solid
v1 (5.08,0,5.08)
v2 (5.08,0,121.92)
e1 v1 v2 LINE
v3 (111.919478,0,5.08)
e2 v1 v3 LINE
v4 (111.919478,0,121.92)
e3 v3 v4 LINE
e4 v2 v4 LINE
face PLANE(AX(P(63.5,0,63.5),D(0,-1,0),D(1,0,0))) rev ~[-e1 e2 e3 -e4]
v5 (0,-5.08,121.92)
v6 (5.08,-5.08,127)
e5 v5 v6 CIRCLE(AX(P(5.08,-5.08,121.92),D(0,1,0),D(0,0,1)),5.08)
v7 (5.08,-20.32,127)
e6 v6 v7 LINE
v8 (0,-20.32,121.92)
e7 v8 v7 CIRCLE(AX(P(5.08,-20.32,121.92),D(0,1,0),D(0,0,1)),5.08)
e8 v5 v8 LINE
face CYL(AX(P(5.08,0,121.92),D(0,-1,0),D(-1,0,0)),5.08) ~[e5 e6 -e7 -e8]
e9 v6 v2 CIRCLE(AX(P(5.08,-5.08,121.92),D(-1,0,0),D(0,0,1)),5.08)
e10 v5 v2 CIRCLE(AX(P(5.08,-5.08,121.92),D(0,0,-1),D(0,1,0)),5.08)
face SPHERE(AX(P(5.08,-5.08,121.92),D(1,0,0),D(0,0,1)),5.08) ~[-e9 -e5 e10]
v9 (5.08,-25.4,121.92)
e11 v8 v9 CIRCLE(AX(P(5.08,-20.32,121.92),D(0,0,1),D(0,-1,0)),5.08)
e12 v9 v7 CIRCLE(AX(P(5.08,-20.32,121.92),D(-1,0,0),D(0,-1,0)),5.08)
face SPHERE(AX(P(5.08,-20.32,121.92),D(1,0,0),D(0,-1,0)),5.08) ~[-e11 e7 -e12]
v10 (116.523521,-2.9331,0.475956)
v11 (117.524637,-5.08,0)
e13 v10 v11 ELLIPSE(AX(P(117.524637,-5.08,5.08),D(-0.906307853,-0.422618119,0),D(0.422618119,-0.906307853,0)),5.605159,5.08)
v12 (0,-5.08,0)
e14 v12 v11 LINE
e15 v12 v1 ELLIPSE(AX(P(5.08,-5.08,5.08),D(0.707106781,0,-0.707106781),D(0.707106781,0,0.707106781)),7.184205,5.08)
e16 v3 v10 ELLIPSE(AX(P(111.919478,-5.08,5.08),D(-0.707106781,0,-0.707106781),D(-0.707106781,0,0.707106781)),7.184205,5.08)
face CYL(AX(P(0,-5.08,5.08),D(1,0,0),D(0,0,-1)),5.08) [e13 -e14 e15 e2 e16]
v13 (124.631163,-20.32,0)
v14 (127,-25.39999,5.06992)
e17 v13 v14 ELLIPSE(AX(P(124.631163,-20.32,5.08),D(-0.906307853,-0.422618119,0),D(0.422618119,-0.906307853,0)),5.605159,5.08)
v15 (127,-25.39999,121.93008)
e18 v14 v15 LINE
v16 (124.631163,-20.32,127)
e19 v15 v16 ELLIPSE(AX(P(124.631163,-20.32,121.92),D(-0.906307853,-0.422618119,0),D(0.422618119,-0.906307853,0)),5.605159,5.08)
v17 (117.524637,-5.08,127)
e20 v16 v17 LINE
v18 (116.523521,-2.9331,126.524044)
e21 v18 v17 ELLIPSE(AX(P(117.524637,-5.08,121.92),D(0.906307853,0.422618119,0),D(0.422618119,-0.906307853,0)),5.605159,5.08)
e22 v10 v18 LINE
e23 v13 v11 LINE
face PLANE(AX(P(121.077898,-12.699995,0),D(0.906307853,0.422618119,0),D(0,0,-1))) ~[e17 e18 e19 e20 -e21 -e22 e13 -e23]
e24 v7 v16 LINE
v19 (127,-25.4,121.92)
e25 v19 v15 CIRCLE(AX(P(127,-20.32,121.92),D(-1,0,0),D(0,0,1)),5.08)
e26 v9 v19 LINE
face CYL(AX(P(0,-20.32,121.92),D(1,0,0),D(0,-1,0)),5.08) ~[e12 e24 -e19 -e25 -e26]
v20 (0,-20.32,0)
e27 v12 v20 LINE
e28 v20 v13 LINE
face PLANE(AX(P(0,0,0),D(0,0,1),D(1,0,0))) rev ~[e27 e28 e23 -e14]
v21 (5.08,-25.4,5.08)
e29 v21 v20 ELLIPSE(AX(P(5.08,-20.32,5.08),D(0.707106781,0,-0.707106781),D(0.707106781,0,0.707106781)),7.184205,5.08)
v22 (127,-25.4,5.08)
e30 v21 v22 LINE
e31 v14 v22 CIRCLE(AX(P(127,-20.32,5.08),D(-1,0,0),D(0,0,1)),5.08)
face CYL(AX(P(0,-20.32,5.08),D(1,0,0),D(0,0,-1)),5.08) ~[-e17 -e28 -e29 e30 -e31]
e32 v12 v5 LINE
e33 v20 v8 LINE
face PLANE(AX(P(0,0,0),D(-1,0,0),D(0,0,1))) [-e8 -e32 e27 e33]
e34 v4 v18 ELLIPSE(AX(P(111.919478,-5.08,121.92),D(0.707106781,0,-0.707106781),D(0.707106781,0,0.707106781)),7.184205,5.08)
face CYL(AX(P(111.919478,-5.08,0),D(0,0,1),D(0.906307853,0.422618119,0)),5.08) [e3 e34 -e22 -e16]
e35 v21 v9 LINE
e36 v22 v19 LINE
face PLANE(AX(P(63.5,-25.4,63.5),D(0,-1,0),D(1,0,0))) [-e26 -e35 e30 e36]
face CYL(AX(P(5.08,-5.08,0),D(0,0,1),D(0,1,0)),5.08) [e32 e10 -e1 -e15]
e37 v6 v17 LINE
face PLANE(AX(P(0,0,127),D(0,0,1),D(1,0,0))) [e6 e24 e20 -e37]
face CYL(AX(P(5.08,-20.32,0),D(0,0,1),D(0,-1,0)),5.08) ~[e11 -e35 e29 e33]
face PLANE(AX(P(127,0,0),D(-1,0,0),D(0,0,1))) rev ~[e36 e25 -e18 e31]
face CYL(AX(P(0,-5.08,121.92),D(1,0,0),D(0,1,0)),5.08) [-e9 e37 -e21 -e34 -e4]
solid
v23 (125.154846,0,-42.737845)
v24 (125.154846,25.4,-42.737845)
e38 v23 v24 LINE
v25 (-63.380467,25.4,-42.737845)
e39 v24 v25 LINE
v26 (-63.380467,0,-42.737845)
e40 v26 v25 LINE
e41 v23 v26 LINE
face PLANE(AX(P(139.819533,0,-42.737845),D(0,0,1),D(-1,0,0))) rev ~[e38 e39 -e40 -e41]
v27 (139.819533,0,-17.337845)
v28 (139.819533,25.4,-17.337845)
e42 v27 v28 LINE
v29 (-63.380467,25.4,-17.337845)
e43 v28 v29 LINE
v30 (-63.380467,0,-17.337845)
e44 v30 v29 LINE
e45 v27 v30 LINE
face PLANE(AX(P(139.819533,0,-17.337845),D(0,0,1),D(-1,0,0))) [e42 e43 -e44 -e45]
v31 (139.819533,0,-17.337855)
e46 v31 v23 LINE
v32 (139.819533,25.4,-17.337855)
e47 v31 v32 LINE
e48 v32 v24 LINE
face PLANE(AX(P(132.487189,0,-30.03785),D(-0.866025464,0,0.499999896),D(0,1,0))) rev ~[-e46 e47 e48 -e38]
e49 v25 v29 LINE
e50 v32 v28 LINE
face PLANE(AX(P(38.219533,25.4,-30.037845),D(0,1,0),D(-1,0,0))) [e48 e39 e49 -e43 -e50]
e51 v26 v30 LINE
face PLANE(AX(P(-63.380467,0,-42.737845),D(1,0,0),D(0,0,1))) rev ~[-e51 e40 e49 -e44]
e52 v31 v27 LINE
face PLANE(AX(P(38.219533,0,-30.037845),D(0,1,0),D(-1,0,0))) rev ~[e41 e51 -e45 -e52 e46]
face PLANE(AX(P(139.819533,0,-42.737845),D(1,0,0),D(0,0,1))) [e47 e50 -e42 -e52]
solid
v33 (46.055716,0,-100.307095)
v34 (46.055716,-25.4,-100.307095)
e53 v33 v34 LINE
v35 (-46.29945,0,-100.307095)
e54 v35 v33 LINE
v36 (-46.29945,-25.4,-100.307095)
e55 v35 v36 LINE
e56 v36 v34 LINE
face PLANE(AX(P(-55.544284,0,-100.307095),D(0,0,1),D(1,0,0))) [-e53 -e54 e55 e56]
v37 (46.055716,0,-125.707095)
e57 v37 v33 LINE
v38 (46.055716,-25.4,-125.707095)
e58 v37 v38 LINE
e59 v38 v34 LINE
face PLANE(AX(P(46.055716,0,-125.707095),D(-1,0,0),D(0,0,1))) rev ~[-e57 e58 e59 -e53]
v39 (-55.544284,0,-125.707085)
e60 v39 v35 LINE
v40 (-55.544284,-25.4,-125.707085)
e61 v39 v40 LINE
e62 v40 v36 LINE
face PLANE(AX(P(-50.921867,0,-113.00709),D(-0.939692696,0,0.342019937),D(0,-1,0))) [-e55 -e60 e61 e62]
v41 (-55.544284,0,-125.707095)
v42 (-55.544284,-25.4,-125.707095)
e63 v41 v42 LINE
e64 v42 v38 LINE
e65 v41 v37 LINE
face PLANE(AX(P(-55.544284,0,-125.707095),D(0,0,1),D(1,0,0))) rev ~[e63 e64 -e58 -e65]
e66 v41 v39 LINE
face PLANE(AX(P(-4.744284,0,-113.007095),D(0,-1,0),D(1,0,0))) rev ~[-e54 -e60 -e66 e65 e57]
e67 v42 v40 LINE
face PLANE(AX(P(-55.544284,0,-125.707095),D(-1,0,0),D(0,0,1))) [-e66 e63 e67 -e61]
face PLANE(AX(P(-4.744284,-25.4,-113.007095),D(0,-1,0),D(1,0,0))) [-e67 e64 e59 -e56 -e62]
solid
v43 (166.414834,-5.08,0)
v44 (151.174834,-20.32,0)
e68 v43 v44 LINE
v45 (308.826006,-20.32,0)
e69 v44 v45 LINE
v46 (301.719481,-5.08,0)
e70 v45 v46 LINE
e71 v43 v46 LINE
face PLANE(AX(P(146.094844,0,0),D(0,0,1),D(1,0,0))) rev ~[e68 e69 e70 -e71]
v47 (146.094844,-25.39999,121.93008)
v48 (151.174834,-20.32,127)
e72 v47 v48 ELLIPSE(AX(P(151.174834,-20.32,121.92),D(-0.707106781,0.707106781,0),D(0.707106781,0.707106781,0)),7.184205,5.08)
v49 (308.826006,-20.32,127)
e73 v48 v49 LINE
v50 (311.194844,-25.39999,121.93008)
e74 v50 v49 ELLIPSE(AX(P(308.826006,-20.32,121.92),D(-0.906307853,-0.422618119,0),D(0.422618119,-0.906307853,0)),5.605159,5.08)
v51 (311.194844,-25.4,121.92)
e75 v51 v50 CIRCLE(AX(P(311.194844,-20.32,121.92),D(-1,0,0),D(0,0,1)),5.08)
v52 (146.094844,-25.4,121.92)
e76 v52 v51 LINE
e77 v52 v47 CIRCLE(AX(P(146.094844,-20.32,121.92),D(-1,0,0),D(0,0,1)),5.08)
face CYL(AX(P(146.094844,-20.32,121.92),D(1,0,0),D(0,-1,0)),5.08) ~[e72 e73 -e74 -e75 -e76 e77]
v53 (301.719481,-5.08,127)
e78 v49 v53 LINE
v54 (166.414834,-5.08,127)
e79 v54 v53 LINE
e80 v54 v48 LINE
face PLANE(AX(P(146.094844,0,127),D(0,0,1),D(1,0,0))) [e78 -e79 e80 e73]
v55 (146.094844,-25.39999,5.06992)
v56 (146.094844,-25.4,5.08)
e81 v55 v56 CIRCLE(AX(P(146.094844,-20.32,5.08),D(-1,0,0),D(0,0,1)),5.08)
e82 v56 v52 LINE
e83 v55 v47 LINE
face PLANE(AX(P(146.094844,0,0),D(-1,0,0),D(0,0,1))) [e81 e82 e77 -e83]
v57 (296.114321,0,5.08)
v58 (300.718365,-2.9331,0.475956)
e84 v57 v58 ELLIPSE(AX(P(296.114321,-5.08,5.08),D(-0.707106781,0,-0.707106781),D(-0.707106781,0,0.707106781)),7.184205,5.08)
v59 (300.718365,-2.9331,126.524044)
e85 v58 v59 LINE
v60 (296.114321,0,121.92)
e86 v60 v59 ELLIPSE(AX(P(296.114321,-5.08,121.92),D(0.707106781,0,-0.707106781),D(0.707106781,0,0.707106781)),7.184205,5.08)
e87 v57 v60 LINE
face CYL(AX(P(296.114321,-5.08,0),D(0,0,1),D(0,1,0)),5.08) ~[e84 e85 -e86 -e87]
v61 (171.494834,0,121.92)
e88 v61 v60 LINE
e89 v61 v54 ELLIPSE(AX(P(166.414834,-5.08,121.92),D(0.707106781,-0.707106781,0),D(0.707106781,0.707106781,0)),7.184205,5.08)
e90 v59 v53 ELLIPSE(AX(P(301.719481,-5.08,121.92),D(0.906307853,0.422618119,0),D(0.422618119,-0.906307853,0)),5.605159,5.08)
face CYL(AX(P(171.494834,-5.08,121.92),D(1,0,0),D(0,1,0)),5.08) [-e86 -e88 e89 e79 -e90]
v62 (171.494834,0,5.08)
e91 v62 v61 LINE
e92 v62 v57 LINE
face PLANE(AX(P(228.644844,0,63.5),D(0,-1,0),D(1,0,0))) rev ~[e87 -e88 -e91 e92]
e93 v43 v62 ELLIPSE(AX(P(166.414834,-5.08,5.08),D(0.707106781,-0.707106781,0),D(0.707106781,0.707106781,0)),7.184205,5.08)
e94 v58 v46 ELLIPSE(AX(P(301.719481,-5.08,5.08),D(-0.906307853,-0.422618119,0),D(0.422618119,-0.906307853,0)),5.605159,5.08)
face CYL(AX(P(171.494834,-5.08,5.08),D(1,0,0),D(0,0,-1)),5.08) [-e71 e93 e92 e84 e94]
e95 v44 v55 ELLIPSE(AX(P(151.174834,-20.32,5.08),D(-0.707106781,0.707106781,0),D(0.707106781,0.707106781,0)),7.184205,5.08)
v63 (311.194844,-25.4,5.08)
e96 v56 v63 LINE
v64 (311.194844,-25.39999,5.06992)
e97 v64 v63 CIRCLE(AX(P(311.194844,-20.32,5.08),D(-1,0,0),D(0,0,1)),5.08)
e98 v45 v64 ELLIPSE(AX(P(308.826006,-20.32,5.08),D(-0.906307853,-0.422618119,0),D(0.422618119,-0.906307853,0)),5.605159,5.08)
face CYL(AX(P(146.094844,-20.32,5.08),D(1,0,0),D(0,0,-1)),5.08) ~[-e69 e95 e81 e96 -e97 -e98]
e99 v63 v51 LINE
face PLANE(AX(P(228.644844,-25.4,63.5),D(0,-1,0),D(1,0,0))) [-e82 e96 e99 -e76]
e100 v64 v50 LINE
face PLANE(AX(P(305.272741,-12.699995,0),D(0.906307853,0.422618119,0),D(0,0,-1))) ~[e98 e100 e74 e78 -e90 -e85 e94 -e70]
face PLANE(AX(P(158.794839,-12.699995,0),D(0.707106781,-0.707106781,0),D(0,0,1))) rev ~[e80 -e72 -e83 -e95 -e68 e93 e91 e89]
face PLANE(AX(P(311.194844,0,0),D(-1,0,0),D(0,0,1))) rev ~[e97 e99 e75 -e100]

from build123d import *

# Parameters (mm, degrees)
F0_W      = 127
F0_H      = 127
F1_DEPTH  = 25.4
F2_SIZE2  = 11.844205
F2_SIZE   = 25.39999
F3_W      = 165.1
F3_H      = 127
F4_DEPTH  = 25.4
F5_SIZE2  = 11.844205
F5_SIZE   = 25.39999
F6_SIZE2  = 25.39999
F6_SIZE   = 25.39999
F7_W      = 203.2
F7_H      = 25.4
F8_DEPTH  = 25.4
F9_SIZE2  = 14.664687
F9_SIZE   = 25.39999
F10_R     = 5.08
F10_2_R   = 5.08
F11_W     = 101.6
F11_H     = 25.4
F12_DEPTH = 25.4
F13_SIZE2 = 9.244834
F13_SIZE  = 25.39999


# Not quite as in the source:
# - a fillet or chamfer is up to 0.001 mm smaller than in the source, because OpenCascade refuses the exact size


with BuildPart() as f1:
    # F0 (on Front) → F1 (new body)
    with BuildSketch(Plane.XZ):
        with Locations((63.5, 63.5)):
            Rectangle(F0_W, F0_H)
    extrude(amount=F1_DEPTH)

    # F2 (size 25.4 and 11.8442145171 in the source; OpenCascade refuses exactly that, so slightly less here)
    f2_edges = [f1.edges().sort_by_distance(p)[0] for p in [
        (127, 0, 63.5),
    ]]
    f2_side = f1.faces().sort_by_distance((127, -12.7, 63.5))[0]
    chamfer(f2_edges, length=F2_SIZE, length2=F2_SIZE2, reference=f2_side)

    # F10
    f10_edges = [f1.edges().sort_by_distance(p)[0] for p in [
        (63.5, -25.4, 127),
        (57.577898, 0, 127),
        (0, -25.4, 63.5),
        (0, -12.7, 127),
        (63.5, -25.4, 0),
        (115.155795, 0, 63.5),
        (57.577897, 0, 0),
        (0, 0, 63.5),
    ]]
    fillet(f10_edges, radius=F10_R)


with BuildPart() as f4:
    # F3 (on Front) → F4 (new body)
    with BuildSketch(Plane.XZ):
        with Locations((228.6448437452, 63.5)):
            Rectangle(F3_W, F3_H)
    extrude(amount=F4_DEPTH)

    # F5 (size 25.4 and 11.8442145171 in the source; OpenCascade refuses exactly that, so slightly less here)
    f5_edges = [f4.edges().sort_by_distance(p)[0] for p in [
        (311.194844, 0, 63.5),
    ]]
    f5_side = f4.faces().sort_by_distance((311.194844, -12.7, 63.5))[0]
    chamfer(f5_edges, length=F5_SIZE, length2=F5_SIZE2, reference=f5_side)

    # F6 (size 25.4 and 25.4 in the source; OpenCascade refuses exactly that, so slightly less here)
    f6_edges = [f4.edges().sort_by_distance(p)[0] for p in [
        (146.094844, 0, 63.5),
    ]]
    chamfer(f6_edges, length=F6_SIZE, length2=F6_SIZE2)

    # F10#2
    f10_2_edges = [f4.edges().sort_by_distance(p)[0] for p in [
        (235.422736, 0, 0),
        (299.350639, 0, 63.5),
        (235.422736, 0, 127),
        (228.644844, -25.4, 127),
        (228.644844, -25.4, 0),
    ]]
    fillet(f10_2_edges, radius=F10_2_R)


with BuildPart() as f8:
    # F7 (on face) → F8 (new body)
    with BuildSketch(Plane(origin=(0, 0, 0), x_dir=(-1, 0, 0), z_dir=(0, 1, 0))):
        with Locations((-38.2195329294, -30.0378452635)):
            Rectangle(F7_W, F7_H)
    extrude(amount=F8_DEPTH)

    # F9 (size 25.4 and 14.6646968374 in the source; OpenCascade refuses exactly that, so slightly less here)
    f9_edges = [f8.edges().sort_by_distance(p)[0] for p in [
        (139.819533, 12.7, -42.737845),
    ]]
    f9_side = f8.faces().sort_by_distance((139.819533, 12.7, -30.037845))[0]
    chamfer(f9_edges, length=F9_SIZE, length2=F9_SIZE2, reference=f9_side)


with BuildPart() as f12:
    # F11 (on Front) → F12 (new body)
    with BuildSketch(Plane.XZ):
        with Locations((-4.744283855, -113.0070951225)):
            Rectangle(F11_W, F11_H)
    extrude(amount=F12_DEPTH)

    # F13 (size 25.4 and 9.2448439504 in the source; OpenCascade refuses exactly that, so slightly less here)
    f13_edges = [f12.edges().sort_by_distance(p)[0] for p in [
        (-55.544284, -12.7, -100.307095),
    ]]
    f13_side = f12.faces().sort_by_distance((-55.544284, -12.7, -113.007095))[0]
    chamfer(f13_edges, length=F13_SIZE, length2=F13_SIZE2, reference=f13_side)


solid = Compound([f1.part, f4.part, f8.part, f12.part])
